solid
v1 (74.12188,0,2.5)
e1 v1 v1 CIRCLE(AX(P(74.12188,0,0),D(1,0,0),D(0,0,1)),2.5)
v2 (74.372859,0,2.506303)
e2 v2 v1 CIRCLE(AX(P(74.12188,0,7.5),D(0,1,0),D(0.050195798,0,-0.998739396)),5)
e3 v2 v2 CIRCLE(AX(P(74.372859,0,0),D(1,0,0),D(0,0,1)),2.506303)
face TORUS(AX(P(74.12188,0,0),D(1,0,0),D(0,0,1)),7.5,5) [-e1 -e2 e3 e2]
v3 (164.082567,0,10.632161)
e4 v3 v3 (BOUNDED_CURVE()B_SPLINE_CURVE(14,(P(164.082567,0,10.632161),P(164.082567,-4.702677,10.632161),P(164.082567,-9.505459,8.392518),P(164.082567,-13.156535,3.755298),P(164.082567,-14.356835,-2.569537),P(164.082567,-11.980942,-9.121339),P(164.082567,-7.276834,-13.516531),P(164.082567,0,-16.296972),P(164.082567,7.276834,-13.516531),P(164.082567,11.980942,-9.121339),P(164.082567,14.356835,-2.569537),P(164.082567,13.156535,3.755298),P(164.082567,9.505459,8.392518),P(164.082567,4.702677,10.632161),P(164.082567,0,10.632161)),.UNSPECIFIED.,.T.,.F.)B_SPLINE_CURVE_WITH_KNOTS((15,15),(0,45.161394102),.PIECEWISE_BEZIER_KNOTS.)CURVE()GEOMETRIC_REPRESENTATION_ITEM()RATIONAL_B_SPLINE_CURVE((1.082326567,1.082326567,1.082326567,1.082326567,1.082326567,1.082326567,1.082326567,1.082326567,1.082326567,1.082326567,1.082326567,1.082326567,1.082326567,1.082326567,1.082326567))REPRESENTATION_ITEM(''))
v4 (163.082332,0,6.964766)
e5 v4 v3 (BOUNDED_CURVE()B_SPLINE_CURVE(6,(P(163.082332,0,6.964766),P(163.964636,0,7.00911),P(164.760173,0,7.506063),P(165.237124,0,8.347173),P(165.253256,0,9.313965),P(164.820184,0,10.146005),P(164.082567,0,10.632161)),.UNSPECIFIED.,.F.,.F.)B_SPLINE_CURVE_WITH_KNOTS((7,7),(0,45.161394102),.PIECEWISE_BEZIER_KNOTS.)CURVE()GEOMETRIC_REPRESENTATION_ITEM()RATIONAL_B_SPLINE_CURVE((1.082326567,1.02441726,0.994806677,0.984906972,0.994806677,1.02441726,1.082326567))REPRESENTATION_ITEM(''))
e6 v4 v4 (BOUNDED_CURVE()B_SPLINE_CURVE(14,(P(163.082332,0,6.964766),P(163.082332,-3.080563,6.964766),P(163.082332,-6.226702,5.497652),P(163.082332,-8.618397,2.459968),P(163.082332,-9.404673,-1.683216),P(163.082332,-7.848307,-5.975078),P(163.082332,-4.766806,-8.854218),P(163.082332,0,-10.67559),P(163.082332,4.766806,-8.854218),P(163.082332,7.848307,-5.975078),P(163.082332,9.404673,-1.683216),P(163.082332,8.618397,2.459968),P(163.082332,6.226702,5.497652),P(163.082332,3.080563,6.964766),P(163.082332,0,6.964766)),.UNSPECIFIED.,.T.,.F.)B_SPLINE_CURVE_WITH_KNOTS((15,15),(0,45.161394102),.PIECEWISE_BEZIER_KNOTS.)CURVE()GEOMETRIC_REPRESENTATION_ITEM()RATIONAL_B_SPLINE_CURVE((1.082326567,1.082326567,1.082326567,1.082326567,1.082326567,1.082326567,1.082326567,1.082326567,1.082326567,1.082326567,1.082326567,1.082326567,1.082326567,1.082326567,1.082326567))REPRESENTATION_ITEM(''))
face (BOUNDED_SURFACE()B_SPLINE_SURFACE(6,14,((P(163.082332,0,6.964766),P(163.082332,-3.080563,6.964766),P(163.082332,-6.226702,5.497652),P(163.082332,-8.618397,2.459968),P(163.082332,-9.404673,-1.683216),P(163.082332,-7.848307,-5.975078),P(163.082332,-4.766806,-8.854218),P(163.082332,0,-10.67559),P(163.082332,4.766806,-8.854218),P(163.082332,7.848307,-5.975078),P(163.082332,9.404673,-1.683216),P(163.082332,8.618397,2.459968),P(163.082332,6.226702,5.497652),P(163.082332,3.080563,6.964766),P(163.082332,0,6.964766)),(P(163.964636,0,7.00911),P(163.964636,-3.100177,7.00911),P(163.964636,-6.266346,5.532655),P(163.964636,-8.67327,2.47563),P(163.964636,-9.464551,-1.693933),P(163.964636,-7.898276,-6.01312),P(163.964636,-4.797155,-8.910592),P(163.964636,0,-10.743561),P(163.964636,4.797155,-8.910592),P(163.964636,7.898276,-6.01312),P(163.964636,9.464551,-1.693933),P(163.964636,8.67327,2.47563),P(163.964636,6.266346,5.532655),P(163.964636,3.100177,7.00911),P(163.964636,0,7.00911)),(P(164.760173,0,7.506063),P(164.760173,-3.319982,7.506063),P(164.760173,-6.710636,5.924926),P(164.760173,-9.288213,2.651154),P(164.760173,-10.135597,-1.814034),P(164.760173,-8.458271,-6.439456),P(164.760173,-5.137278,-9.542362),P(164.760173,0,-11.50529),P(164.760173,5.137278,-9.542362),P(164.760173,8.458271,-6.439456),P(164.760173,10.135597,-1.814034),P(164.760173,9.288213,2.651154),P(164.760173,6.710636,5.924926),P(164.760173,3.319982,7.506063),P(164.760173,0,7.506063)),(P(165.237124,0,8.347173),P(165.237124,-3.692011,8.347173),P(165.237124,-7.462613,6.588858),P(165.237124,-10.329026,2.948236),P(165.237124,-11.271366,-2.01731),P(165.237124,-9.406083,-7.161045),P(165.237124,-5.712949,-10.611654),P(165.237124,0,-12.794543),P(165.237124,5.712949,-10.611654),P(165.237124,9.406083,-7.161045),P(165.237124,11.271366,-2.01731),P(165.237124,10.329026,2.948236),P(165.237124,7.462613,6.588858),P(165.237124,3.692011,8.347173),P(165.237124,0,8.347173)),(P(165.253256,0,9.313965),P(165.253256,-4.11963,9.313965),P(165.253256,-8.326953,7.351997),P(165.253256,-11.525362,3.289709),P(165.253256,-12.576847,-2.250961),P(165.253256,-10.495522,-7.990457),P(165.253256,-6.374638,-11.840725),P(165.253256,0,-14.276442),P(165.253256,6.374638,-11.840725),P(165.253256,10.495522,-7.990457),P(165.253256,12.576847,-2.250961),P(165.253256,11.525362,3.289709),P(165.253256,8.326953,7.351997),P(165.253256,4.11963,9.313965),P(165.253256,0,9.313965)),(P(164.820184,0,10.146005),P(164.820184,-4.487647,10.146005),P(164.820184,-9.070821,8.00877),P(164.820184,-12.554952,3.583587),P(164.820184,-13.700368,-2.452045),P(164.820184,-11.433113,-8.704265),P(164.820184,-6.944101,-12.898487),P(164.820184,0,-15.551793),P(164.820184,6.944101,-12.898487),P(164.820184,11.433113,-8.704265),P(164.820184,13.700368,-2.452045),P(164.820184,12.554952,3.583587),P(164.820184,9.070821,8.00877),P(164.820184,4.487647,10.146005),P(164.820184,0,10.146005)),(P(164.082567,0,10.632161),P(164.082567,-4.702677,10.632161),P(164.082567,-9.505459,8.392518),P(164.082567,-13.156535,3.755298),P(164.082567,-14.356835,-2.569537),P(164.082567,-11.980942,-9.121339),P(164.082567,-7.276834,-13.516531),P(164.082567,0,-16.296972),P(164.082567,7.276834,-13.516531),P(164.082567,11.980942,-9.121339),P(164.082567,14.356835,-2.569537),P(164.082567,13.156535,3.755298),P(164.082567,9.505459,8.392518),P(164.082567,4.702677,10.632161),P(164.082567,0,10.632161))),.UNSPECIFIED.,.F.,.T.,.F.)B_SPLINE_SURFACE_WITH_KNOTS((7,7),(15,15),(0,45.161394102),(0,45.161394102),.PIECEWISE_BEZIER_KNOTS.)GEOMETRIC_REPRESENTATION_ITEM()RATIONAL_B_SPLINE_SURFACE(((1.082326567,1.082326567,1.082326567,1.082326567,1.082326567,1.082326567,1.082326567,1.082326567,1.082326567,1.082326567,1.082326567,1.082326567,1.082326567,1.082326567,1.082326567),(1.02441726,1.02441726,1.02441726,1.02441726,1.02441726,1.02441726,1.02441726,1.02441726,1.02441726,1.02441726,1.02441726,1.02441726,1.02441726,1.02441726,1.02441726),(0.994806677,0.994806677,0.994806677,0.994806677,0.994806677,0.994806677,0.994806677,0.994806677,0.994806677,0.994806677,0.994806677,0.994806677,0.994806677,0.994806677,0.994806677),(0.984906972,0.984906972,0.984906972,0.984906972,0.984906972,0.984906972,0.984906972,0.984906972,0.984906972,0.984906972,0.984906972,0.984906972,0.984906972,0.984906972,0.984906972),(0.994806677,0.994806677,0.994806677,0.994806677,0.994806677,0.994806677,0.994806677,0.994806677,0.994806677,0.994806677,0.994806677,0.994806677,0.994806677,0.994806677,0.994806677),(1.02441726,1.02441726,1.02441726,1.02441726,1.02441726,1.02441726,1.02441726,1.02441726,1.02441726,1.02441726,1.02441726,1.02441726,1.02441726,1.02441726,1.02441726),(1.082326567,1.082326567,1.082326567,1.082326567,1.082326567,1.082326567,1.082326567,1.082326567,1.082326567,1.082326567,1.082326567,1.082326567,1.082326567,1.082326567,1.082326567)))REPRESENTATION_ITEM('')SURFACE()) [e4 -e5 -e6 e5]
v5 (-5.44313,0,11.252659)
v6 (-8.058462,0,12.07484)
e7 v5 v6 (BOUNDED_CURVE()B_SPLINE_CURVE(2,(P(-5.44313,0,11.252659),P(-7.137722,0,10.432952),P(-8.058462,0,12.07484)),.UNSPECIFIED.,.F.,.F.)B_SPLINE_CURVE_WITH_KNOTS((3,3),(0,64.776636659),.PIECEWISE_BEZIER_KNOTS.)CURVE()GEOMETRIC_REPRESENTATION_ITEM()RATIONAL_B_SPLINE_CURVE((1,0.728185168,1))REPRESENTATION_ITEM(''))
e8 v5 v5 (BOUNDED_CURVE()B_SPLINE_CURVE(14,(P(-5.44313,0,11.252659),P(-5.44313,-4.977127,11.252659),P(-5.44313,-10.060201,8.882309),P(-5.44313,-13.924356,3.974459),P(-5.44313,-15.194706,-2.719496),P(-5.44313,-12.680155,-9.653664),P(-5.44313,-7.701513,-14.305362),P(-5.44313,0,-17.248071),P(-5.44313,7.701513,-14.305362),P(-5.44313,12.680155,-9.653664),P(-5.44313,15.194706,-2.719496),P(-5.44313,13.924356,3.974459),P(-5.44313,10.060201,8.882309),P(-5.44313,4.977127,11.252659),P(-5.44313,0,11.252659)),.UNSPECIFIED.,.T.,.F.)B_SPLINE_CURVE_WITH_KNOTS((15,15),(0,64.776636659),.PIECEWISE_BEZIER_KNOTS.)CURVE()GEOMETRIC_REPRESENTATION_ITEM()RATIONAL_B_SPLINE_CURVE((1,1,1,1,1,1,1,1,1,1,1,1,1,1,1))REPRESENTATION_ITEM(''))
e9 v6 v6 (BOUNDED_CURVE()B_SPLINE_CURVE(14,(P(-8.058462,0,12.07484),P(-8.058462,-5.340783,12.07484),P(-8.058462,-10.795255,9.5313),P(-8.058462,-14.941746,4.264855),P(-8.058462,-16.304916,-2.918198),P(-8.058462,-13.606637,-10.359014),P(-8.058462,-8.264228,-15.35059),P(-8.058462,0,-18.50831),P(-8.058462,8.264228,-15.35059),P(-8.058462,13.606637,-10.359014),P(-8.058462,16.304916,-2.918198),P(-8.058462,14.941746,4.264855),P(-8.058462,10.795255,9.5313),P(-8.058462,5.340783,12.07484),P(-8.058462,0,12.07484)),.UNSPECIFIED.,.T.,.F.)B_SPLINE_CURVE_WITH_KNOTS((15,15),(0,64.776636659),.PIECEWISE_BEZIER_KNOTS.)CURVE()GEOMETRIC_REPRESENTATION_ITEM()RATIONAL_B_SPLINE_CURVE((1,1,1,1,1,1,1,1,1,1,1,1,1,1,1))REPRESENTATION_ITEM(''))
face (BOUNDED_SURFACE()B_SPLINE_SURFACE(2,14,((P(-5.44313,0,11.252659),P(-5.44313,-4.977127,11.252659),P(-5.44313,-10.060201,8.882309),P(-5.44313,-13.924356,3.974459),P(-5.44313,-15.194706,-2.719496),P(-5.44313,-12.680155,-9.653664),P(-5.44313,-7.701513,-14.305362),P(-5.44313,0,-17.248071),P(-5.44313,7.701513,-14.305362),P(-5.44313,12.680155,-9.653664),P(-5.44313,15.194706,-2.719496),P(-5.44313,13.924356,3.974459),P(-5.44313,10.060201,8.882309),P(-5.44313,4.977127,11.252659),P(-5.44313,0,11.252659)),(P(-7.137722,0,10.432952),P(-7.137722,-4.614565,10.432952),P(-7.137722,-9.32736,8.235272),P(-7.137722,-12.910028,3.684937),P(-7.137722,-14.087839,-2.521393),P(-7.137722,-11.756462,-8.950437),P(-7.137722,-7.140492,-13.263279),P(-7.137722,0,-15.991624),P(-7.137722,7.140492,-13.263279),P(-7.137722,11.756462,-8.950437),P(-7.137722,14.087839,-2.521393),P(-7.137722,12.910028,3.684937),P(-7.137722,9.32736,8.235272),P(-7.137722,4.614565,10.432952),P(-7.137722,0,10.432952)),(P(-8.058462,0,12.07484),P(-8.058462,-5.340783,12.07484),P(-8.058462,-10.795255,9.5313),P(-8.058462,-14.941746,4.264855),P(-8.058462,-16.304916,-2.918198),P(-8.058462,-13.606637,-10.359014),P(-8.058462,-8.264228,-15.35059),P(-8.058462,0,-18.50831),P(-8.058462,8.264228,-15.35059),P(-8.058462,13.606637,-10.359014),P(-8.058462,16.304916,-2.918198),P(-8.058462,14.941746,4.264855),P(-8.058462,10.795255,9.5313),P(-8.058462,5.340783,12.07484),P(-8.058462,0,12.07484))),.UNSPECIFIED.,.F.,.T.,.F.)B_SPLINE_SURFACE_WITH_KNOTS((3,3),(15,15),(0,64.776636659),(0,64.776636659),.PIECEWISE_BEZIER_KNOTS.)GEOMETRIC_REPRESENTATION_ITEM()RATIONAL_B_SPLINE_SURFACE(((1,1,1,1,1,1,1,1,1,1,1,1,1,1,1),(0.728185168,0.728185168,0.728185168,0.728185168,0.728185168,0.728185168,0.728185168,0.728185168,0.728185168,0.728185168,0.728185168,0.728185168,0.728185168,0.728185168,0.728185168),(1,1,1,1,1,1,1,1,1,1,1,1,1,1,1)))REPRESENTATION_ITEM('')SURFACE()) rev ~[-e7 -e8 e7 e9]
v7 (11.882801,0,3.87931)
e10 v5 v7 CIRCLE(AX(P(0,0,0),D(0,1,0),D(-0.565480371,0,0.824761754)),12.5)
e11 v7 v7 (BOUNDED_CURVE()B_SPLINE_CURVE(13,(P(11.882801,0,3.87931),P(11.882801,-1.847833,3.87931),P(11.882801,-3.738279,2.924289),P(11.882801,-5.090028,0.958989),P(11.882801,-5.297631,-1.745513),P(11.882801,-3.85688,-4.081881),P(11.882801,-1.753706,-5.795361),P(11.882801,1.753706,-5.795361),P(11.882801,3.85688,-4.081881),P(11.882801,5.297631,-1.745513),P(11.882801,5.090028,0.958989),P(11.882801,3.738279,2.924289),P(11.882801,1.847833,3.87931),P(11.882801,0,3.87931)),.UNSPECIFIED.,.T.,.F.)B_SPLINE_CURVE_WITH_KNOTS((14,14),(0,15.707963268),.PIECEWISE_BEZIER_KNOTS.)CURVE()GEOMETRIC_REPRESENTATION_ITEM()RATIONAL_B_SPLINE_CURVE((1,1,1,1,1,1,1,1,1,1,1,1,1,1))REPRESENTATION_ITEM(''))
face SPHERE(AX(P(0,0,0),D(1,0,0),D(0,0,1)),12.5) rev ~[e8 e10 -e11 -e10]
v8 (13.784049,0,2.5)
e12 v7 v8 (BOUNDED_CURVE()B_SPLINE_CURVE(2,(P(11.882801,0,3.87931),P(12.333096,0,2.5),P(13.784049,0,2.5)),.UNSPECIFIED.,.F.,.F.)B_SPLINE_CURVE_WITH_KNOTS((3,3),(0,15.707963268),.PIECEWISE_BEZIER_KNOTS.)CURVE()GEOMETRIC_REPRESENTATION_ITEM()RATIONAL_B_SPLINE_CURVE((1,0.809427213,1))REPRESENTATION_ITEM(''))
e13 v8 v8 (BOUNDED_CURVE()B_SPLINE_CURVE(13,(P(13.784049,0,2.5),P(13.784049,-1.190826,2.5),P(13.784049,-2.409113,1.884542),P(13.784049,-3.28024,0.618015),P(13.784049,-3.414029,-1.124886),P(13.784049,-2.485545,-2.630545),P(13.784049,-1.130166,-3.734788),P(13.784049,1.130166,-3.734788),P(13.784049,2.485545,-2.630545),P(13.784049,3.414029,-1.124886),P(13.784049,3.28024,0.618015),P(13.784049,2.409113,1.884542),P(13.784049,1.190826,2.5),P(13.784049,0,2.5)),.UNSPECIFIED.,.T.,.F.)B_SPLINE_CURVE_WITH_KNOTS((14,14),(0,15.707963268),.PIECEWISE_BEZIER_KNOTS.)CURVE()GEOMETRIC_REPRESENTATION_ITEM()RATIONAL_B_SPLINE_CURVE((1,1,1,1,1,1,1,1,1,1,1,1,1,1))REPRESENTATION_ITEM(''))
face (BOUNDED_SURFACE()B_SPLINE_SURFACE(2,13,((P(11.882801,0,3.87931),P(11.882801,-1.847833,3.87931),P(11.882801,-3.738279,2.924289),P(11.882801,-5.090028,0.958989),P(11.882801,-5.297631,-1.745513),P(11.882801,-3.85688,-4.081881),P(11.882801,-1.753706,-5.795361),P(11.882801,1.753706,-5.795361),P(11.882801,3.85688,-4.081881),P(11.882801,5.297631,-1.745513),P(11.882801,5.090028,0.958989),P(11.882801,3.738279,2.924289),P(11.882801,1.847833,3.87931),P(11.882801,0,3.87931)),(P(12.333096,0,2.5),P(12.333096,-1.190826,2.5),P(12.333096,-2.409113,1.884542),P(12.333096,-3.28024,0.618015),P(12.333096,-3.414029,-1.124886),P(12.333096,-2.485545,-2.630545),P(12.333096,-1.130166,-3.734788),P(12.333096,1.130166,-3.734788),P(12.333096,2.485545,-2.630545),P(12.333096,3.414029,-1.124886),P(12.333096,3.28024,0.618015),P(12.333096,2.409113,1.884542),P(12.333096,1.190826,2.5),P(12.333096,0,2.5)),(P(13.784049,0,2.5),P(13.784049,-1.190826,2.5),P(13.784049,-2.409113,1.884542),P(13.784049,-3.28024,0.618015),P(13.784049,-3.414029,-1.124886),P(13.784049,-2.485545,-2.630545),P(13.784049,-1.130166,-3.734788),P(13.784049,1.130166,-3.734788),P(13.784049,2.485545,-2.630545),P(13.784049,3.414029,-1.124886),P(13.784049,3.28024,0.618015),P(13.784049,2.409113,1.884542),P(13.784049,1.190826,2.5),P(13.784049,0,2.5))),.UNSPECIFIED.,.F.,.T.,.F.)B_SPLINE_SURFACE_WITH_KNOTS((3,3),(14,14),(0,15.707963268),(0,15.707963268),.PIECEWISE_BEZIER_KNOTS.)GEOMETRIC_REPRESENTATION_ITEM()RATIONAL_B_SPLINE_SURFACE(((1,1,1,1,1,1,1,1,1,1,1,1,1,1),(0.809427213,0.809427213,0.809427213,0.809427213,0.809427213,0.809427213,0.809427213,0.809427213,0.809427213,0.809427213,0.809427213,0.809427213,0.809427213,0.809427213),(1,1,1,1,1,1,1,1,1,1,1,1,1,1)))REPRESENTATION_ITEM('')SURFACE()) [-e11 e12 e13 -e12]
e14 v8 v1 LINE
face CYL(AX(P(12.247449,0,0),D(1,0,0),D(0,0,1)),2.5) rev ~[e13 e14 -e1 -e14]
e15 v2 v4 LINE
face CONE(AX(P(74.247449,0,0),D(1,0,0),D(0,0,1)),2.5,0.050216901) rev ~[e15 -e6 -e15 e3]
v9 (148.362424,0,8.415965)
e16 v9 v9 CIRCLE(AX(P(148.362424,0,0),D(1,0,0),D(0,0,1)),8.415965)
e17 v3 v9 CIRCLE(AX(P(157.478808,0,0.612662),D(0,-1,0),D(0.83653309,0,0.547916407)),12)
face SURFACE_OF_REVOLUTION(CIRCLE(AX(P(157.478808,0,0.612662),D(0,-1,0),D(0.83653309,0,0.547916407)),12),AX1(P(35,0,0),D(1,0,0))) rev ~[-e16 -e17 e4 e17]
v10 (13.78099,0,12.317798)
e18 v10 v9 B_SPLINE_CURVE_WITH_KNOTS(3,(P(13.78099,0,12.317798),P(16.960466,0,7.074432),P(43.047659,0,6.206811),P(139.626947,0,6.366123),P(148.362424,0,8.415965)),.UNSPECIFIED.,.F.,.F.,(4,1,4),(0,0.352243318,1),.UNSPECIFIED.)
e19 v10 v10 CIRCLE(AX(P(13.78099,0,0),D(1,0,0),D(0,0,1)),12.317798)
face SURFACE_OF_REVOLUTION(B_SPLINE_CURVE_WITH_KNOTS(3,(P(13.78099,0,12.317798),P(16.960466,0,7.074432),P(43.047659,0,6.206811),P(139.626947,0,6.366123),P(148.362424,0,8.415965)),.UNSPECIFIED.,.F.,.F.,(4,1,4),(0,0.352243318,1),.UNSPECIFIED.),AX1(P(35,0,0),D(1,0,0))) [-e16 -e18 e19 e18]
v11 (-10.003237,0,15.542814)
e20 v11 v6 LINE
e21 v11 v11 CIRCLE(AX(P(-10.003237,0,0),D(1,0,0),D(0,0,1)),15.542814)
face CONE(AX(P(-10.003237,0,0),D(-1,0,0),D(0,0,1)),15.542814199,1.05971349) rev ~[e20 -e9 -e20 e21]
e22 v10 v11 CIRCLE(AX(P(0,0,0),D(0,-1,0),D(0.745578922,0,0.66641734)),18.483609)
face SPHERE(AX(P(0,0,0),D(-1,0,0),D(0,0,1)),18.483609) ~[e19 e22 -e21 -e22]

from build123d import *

# Parameters (mm, degrees)
F2_R = 2


# Not quite as in the source:
# - a fillet or chamfer that OpenCascade refuses, or shapes differently, is made with other operations: its cross-section is extruded or revolved along the edge and cut away or added


with BuildPart() as f1:
    # F0 (on Front) → F1 (revolve)
    with BuildSketch(Plane.XZ):
        with BuildLine():
            ThreePointArc((-7.0685046336, 10.3095219212), (4.6853520259, 11.5886788028), (12.2474487139, 2.5))
            Line((12.2474487139, 2.5), (74.2474487139, 2.5))
            Line((74.2474487139, 2.5), (167.5172053195, 7.1876591082))
            ThreePointArc((167.5172053195, 7.1876591082), (158.2467343848, 12.5880657376), (148.3624236969, 8.4159649071))
            add(Edge.make_bspline(
                [(13.7809895682, 12.3177978136), (16.9604661176, 7.0744322303), (43.0476593441, 6.206811463), (139.6269473455, 6.3661232123), (148.3624236969, 8.4159649071)],
                knots=[0, 0, 0, 0, 0.3522433177, 1, 1, 1, 1], degree=3))
            ThreePointArc((13.7809895682, 12.3177978136), (2.4835532955, 18.3159979112), (-10.003236638, 15.5428141988))
            Line((-10.003236638, 15.5428141988), (-7.0685046336, 10.3095219212))
        make_face()
    revolve(axis=Axis((35, 0, 0), (1, 0, 0)))

    # F2
    f2_edges = [f1.edges().sort_by_distance(p)[0] for p in [
        (167.517205, 0, -7.187659),
        (-7.068505, 0, -10.309522),
        (12.247449, 0, -2.5),
    ]]
    fillet(f2_edges, radius=F2_R)

    # F3: fillet of radius 5 on 1 edges, made by hand

    # F3_s1 → F3_t2 (revolve, cut)
    with BuildSketch(Plane.XZ):
        with BuildLine():
            ThreePointArc((74.3728590619, 2.5063030181), (74.2474091346, 2.5015760029), (74.1218800737, 2.5))
            Line((74.1218800737, 2.5), (74.1218800737, 2.4))
            Line((74.1218800737, 2.4), (74.2499600867, 2.4))
            Line((74.2499600867, 2.4), (74.3778786416, 2.4064290784))
            Line((74.3778786416, 2.4064290784), (74.3728590619, 2.5063030181))
        make_face()
    revolve(axis=Axis((74.2474487139, 0, 0), (1, 0, 0)), mode=Mode.SUBTRACT)


solid = f1.part
